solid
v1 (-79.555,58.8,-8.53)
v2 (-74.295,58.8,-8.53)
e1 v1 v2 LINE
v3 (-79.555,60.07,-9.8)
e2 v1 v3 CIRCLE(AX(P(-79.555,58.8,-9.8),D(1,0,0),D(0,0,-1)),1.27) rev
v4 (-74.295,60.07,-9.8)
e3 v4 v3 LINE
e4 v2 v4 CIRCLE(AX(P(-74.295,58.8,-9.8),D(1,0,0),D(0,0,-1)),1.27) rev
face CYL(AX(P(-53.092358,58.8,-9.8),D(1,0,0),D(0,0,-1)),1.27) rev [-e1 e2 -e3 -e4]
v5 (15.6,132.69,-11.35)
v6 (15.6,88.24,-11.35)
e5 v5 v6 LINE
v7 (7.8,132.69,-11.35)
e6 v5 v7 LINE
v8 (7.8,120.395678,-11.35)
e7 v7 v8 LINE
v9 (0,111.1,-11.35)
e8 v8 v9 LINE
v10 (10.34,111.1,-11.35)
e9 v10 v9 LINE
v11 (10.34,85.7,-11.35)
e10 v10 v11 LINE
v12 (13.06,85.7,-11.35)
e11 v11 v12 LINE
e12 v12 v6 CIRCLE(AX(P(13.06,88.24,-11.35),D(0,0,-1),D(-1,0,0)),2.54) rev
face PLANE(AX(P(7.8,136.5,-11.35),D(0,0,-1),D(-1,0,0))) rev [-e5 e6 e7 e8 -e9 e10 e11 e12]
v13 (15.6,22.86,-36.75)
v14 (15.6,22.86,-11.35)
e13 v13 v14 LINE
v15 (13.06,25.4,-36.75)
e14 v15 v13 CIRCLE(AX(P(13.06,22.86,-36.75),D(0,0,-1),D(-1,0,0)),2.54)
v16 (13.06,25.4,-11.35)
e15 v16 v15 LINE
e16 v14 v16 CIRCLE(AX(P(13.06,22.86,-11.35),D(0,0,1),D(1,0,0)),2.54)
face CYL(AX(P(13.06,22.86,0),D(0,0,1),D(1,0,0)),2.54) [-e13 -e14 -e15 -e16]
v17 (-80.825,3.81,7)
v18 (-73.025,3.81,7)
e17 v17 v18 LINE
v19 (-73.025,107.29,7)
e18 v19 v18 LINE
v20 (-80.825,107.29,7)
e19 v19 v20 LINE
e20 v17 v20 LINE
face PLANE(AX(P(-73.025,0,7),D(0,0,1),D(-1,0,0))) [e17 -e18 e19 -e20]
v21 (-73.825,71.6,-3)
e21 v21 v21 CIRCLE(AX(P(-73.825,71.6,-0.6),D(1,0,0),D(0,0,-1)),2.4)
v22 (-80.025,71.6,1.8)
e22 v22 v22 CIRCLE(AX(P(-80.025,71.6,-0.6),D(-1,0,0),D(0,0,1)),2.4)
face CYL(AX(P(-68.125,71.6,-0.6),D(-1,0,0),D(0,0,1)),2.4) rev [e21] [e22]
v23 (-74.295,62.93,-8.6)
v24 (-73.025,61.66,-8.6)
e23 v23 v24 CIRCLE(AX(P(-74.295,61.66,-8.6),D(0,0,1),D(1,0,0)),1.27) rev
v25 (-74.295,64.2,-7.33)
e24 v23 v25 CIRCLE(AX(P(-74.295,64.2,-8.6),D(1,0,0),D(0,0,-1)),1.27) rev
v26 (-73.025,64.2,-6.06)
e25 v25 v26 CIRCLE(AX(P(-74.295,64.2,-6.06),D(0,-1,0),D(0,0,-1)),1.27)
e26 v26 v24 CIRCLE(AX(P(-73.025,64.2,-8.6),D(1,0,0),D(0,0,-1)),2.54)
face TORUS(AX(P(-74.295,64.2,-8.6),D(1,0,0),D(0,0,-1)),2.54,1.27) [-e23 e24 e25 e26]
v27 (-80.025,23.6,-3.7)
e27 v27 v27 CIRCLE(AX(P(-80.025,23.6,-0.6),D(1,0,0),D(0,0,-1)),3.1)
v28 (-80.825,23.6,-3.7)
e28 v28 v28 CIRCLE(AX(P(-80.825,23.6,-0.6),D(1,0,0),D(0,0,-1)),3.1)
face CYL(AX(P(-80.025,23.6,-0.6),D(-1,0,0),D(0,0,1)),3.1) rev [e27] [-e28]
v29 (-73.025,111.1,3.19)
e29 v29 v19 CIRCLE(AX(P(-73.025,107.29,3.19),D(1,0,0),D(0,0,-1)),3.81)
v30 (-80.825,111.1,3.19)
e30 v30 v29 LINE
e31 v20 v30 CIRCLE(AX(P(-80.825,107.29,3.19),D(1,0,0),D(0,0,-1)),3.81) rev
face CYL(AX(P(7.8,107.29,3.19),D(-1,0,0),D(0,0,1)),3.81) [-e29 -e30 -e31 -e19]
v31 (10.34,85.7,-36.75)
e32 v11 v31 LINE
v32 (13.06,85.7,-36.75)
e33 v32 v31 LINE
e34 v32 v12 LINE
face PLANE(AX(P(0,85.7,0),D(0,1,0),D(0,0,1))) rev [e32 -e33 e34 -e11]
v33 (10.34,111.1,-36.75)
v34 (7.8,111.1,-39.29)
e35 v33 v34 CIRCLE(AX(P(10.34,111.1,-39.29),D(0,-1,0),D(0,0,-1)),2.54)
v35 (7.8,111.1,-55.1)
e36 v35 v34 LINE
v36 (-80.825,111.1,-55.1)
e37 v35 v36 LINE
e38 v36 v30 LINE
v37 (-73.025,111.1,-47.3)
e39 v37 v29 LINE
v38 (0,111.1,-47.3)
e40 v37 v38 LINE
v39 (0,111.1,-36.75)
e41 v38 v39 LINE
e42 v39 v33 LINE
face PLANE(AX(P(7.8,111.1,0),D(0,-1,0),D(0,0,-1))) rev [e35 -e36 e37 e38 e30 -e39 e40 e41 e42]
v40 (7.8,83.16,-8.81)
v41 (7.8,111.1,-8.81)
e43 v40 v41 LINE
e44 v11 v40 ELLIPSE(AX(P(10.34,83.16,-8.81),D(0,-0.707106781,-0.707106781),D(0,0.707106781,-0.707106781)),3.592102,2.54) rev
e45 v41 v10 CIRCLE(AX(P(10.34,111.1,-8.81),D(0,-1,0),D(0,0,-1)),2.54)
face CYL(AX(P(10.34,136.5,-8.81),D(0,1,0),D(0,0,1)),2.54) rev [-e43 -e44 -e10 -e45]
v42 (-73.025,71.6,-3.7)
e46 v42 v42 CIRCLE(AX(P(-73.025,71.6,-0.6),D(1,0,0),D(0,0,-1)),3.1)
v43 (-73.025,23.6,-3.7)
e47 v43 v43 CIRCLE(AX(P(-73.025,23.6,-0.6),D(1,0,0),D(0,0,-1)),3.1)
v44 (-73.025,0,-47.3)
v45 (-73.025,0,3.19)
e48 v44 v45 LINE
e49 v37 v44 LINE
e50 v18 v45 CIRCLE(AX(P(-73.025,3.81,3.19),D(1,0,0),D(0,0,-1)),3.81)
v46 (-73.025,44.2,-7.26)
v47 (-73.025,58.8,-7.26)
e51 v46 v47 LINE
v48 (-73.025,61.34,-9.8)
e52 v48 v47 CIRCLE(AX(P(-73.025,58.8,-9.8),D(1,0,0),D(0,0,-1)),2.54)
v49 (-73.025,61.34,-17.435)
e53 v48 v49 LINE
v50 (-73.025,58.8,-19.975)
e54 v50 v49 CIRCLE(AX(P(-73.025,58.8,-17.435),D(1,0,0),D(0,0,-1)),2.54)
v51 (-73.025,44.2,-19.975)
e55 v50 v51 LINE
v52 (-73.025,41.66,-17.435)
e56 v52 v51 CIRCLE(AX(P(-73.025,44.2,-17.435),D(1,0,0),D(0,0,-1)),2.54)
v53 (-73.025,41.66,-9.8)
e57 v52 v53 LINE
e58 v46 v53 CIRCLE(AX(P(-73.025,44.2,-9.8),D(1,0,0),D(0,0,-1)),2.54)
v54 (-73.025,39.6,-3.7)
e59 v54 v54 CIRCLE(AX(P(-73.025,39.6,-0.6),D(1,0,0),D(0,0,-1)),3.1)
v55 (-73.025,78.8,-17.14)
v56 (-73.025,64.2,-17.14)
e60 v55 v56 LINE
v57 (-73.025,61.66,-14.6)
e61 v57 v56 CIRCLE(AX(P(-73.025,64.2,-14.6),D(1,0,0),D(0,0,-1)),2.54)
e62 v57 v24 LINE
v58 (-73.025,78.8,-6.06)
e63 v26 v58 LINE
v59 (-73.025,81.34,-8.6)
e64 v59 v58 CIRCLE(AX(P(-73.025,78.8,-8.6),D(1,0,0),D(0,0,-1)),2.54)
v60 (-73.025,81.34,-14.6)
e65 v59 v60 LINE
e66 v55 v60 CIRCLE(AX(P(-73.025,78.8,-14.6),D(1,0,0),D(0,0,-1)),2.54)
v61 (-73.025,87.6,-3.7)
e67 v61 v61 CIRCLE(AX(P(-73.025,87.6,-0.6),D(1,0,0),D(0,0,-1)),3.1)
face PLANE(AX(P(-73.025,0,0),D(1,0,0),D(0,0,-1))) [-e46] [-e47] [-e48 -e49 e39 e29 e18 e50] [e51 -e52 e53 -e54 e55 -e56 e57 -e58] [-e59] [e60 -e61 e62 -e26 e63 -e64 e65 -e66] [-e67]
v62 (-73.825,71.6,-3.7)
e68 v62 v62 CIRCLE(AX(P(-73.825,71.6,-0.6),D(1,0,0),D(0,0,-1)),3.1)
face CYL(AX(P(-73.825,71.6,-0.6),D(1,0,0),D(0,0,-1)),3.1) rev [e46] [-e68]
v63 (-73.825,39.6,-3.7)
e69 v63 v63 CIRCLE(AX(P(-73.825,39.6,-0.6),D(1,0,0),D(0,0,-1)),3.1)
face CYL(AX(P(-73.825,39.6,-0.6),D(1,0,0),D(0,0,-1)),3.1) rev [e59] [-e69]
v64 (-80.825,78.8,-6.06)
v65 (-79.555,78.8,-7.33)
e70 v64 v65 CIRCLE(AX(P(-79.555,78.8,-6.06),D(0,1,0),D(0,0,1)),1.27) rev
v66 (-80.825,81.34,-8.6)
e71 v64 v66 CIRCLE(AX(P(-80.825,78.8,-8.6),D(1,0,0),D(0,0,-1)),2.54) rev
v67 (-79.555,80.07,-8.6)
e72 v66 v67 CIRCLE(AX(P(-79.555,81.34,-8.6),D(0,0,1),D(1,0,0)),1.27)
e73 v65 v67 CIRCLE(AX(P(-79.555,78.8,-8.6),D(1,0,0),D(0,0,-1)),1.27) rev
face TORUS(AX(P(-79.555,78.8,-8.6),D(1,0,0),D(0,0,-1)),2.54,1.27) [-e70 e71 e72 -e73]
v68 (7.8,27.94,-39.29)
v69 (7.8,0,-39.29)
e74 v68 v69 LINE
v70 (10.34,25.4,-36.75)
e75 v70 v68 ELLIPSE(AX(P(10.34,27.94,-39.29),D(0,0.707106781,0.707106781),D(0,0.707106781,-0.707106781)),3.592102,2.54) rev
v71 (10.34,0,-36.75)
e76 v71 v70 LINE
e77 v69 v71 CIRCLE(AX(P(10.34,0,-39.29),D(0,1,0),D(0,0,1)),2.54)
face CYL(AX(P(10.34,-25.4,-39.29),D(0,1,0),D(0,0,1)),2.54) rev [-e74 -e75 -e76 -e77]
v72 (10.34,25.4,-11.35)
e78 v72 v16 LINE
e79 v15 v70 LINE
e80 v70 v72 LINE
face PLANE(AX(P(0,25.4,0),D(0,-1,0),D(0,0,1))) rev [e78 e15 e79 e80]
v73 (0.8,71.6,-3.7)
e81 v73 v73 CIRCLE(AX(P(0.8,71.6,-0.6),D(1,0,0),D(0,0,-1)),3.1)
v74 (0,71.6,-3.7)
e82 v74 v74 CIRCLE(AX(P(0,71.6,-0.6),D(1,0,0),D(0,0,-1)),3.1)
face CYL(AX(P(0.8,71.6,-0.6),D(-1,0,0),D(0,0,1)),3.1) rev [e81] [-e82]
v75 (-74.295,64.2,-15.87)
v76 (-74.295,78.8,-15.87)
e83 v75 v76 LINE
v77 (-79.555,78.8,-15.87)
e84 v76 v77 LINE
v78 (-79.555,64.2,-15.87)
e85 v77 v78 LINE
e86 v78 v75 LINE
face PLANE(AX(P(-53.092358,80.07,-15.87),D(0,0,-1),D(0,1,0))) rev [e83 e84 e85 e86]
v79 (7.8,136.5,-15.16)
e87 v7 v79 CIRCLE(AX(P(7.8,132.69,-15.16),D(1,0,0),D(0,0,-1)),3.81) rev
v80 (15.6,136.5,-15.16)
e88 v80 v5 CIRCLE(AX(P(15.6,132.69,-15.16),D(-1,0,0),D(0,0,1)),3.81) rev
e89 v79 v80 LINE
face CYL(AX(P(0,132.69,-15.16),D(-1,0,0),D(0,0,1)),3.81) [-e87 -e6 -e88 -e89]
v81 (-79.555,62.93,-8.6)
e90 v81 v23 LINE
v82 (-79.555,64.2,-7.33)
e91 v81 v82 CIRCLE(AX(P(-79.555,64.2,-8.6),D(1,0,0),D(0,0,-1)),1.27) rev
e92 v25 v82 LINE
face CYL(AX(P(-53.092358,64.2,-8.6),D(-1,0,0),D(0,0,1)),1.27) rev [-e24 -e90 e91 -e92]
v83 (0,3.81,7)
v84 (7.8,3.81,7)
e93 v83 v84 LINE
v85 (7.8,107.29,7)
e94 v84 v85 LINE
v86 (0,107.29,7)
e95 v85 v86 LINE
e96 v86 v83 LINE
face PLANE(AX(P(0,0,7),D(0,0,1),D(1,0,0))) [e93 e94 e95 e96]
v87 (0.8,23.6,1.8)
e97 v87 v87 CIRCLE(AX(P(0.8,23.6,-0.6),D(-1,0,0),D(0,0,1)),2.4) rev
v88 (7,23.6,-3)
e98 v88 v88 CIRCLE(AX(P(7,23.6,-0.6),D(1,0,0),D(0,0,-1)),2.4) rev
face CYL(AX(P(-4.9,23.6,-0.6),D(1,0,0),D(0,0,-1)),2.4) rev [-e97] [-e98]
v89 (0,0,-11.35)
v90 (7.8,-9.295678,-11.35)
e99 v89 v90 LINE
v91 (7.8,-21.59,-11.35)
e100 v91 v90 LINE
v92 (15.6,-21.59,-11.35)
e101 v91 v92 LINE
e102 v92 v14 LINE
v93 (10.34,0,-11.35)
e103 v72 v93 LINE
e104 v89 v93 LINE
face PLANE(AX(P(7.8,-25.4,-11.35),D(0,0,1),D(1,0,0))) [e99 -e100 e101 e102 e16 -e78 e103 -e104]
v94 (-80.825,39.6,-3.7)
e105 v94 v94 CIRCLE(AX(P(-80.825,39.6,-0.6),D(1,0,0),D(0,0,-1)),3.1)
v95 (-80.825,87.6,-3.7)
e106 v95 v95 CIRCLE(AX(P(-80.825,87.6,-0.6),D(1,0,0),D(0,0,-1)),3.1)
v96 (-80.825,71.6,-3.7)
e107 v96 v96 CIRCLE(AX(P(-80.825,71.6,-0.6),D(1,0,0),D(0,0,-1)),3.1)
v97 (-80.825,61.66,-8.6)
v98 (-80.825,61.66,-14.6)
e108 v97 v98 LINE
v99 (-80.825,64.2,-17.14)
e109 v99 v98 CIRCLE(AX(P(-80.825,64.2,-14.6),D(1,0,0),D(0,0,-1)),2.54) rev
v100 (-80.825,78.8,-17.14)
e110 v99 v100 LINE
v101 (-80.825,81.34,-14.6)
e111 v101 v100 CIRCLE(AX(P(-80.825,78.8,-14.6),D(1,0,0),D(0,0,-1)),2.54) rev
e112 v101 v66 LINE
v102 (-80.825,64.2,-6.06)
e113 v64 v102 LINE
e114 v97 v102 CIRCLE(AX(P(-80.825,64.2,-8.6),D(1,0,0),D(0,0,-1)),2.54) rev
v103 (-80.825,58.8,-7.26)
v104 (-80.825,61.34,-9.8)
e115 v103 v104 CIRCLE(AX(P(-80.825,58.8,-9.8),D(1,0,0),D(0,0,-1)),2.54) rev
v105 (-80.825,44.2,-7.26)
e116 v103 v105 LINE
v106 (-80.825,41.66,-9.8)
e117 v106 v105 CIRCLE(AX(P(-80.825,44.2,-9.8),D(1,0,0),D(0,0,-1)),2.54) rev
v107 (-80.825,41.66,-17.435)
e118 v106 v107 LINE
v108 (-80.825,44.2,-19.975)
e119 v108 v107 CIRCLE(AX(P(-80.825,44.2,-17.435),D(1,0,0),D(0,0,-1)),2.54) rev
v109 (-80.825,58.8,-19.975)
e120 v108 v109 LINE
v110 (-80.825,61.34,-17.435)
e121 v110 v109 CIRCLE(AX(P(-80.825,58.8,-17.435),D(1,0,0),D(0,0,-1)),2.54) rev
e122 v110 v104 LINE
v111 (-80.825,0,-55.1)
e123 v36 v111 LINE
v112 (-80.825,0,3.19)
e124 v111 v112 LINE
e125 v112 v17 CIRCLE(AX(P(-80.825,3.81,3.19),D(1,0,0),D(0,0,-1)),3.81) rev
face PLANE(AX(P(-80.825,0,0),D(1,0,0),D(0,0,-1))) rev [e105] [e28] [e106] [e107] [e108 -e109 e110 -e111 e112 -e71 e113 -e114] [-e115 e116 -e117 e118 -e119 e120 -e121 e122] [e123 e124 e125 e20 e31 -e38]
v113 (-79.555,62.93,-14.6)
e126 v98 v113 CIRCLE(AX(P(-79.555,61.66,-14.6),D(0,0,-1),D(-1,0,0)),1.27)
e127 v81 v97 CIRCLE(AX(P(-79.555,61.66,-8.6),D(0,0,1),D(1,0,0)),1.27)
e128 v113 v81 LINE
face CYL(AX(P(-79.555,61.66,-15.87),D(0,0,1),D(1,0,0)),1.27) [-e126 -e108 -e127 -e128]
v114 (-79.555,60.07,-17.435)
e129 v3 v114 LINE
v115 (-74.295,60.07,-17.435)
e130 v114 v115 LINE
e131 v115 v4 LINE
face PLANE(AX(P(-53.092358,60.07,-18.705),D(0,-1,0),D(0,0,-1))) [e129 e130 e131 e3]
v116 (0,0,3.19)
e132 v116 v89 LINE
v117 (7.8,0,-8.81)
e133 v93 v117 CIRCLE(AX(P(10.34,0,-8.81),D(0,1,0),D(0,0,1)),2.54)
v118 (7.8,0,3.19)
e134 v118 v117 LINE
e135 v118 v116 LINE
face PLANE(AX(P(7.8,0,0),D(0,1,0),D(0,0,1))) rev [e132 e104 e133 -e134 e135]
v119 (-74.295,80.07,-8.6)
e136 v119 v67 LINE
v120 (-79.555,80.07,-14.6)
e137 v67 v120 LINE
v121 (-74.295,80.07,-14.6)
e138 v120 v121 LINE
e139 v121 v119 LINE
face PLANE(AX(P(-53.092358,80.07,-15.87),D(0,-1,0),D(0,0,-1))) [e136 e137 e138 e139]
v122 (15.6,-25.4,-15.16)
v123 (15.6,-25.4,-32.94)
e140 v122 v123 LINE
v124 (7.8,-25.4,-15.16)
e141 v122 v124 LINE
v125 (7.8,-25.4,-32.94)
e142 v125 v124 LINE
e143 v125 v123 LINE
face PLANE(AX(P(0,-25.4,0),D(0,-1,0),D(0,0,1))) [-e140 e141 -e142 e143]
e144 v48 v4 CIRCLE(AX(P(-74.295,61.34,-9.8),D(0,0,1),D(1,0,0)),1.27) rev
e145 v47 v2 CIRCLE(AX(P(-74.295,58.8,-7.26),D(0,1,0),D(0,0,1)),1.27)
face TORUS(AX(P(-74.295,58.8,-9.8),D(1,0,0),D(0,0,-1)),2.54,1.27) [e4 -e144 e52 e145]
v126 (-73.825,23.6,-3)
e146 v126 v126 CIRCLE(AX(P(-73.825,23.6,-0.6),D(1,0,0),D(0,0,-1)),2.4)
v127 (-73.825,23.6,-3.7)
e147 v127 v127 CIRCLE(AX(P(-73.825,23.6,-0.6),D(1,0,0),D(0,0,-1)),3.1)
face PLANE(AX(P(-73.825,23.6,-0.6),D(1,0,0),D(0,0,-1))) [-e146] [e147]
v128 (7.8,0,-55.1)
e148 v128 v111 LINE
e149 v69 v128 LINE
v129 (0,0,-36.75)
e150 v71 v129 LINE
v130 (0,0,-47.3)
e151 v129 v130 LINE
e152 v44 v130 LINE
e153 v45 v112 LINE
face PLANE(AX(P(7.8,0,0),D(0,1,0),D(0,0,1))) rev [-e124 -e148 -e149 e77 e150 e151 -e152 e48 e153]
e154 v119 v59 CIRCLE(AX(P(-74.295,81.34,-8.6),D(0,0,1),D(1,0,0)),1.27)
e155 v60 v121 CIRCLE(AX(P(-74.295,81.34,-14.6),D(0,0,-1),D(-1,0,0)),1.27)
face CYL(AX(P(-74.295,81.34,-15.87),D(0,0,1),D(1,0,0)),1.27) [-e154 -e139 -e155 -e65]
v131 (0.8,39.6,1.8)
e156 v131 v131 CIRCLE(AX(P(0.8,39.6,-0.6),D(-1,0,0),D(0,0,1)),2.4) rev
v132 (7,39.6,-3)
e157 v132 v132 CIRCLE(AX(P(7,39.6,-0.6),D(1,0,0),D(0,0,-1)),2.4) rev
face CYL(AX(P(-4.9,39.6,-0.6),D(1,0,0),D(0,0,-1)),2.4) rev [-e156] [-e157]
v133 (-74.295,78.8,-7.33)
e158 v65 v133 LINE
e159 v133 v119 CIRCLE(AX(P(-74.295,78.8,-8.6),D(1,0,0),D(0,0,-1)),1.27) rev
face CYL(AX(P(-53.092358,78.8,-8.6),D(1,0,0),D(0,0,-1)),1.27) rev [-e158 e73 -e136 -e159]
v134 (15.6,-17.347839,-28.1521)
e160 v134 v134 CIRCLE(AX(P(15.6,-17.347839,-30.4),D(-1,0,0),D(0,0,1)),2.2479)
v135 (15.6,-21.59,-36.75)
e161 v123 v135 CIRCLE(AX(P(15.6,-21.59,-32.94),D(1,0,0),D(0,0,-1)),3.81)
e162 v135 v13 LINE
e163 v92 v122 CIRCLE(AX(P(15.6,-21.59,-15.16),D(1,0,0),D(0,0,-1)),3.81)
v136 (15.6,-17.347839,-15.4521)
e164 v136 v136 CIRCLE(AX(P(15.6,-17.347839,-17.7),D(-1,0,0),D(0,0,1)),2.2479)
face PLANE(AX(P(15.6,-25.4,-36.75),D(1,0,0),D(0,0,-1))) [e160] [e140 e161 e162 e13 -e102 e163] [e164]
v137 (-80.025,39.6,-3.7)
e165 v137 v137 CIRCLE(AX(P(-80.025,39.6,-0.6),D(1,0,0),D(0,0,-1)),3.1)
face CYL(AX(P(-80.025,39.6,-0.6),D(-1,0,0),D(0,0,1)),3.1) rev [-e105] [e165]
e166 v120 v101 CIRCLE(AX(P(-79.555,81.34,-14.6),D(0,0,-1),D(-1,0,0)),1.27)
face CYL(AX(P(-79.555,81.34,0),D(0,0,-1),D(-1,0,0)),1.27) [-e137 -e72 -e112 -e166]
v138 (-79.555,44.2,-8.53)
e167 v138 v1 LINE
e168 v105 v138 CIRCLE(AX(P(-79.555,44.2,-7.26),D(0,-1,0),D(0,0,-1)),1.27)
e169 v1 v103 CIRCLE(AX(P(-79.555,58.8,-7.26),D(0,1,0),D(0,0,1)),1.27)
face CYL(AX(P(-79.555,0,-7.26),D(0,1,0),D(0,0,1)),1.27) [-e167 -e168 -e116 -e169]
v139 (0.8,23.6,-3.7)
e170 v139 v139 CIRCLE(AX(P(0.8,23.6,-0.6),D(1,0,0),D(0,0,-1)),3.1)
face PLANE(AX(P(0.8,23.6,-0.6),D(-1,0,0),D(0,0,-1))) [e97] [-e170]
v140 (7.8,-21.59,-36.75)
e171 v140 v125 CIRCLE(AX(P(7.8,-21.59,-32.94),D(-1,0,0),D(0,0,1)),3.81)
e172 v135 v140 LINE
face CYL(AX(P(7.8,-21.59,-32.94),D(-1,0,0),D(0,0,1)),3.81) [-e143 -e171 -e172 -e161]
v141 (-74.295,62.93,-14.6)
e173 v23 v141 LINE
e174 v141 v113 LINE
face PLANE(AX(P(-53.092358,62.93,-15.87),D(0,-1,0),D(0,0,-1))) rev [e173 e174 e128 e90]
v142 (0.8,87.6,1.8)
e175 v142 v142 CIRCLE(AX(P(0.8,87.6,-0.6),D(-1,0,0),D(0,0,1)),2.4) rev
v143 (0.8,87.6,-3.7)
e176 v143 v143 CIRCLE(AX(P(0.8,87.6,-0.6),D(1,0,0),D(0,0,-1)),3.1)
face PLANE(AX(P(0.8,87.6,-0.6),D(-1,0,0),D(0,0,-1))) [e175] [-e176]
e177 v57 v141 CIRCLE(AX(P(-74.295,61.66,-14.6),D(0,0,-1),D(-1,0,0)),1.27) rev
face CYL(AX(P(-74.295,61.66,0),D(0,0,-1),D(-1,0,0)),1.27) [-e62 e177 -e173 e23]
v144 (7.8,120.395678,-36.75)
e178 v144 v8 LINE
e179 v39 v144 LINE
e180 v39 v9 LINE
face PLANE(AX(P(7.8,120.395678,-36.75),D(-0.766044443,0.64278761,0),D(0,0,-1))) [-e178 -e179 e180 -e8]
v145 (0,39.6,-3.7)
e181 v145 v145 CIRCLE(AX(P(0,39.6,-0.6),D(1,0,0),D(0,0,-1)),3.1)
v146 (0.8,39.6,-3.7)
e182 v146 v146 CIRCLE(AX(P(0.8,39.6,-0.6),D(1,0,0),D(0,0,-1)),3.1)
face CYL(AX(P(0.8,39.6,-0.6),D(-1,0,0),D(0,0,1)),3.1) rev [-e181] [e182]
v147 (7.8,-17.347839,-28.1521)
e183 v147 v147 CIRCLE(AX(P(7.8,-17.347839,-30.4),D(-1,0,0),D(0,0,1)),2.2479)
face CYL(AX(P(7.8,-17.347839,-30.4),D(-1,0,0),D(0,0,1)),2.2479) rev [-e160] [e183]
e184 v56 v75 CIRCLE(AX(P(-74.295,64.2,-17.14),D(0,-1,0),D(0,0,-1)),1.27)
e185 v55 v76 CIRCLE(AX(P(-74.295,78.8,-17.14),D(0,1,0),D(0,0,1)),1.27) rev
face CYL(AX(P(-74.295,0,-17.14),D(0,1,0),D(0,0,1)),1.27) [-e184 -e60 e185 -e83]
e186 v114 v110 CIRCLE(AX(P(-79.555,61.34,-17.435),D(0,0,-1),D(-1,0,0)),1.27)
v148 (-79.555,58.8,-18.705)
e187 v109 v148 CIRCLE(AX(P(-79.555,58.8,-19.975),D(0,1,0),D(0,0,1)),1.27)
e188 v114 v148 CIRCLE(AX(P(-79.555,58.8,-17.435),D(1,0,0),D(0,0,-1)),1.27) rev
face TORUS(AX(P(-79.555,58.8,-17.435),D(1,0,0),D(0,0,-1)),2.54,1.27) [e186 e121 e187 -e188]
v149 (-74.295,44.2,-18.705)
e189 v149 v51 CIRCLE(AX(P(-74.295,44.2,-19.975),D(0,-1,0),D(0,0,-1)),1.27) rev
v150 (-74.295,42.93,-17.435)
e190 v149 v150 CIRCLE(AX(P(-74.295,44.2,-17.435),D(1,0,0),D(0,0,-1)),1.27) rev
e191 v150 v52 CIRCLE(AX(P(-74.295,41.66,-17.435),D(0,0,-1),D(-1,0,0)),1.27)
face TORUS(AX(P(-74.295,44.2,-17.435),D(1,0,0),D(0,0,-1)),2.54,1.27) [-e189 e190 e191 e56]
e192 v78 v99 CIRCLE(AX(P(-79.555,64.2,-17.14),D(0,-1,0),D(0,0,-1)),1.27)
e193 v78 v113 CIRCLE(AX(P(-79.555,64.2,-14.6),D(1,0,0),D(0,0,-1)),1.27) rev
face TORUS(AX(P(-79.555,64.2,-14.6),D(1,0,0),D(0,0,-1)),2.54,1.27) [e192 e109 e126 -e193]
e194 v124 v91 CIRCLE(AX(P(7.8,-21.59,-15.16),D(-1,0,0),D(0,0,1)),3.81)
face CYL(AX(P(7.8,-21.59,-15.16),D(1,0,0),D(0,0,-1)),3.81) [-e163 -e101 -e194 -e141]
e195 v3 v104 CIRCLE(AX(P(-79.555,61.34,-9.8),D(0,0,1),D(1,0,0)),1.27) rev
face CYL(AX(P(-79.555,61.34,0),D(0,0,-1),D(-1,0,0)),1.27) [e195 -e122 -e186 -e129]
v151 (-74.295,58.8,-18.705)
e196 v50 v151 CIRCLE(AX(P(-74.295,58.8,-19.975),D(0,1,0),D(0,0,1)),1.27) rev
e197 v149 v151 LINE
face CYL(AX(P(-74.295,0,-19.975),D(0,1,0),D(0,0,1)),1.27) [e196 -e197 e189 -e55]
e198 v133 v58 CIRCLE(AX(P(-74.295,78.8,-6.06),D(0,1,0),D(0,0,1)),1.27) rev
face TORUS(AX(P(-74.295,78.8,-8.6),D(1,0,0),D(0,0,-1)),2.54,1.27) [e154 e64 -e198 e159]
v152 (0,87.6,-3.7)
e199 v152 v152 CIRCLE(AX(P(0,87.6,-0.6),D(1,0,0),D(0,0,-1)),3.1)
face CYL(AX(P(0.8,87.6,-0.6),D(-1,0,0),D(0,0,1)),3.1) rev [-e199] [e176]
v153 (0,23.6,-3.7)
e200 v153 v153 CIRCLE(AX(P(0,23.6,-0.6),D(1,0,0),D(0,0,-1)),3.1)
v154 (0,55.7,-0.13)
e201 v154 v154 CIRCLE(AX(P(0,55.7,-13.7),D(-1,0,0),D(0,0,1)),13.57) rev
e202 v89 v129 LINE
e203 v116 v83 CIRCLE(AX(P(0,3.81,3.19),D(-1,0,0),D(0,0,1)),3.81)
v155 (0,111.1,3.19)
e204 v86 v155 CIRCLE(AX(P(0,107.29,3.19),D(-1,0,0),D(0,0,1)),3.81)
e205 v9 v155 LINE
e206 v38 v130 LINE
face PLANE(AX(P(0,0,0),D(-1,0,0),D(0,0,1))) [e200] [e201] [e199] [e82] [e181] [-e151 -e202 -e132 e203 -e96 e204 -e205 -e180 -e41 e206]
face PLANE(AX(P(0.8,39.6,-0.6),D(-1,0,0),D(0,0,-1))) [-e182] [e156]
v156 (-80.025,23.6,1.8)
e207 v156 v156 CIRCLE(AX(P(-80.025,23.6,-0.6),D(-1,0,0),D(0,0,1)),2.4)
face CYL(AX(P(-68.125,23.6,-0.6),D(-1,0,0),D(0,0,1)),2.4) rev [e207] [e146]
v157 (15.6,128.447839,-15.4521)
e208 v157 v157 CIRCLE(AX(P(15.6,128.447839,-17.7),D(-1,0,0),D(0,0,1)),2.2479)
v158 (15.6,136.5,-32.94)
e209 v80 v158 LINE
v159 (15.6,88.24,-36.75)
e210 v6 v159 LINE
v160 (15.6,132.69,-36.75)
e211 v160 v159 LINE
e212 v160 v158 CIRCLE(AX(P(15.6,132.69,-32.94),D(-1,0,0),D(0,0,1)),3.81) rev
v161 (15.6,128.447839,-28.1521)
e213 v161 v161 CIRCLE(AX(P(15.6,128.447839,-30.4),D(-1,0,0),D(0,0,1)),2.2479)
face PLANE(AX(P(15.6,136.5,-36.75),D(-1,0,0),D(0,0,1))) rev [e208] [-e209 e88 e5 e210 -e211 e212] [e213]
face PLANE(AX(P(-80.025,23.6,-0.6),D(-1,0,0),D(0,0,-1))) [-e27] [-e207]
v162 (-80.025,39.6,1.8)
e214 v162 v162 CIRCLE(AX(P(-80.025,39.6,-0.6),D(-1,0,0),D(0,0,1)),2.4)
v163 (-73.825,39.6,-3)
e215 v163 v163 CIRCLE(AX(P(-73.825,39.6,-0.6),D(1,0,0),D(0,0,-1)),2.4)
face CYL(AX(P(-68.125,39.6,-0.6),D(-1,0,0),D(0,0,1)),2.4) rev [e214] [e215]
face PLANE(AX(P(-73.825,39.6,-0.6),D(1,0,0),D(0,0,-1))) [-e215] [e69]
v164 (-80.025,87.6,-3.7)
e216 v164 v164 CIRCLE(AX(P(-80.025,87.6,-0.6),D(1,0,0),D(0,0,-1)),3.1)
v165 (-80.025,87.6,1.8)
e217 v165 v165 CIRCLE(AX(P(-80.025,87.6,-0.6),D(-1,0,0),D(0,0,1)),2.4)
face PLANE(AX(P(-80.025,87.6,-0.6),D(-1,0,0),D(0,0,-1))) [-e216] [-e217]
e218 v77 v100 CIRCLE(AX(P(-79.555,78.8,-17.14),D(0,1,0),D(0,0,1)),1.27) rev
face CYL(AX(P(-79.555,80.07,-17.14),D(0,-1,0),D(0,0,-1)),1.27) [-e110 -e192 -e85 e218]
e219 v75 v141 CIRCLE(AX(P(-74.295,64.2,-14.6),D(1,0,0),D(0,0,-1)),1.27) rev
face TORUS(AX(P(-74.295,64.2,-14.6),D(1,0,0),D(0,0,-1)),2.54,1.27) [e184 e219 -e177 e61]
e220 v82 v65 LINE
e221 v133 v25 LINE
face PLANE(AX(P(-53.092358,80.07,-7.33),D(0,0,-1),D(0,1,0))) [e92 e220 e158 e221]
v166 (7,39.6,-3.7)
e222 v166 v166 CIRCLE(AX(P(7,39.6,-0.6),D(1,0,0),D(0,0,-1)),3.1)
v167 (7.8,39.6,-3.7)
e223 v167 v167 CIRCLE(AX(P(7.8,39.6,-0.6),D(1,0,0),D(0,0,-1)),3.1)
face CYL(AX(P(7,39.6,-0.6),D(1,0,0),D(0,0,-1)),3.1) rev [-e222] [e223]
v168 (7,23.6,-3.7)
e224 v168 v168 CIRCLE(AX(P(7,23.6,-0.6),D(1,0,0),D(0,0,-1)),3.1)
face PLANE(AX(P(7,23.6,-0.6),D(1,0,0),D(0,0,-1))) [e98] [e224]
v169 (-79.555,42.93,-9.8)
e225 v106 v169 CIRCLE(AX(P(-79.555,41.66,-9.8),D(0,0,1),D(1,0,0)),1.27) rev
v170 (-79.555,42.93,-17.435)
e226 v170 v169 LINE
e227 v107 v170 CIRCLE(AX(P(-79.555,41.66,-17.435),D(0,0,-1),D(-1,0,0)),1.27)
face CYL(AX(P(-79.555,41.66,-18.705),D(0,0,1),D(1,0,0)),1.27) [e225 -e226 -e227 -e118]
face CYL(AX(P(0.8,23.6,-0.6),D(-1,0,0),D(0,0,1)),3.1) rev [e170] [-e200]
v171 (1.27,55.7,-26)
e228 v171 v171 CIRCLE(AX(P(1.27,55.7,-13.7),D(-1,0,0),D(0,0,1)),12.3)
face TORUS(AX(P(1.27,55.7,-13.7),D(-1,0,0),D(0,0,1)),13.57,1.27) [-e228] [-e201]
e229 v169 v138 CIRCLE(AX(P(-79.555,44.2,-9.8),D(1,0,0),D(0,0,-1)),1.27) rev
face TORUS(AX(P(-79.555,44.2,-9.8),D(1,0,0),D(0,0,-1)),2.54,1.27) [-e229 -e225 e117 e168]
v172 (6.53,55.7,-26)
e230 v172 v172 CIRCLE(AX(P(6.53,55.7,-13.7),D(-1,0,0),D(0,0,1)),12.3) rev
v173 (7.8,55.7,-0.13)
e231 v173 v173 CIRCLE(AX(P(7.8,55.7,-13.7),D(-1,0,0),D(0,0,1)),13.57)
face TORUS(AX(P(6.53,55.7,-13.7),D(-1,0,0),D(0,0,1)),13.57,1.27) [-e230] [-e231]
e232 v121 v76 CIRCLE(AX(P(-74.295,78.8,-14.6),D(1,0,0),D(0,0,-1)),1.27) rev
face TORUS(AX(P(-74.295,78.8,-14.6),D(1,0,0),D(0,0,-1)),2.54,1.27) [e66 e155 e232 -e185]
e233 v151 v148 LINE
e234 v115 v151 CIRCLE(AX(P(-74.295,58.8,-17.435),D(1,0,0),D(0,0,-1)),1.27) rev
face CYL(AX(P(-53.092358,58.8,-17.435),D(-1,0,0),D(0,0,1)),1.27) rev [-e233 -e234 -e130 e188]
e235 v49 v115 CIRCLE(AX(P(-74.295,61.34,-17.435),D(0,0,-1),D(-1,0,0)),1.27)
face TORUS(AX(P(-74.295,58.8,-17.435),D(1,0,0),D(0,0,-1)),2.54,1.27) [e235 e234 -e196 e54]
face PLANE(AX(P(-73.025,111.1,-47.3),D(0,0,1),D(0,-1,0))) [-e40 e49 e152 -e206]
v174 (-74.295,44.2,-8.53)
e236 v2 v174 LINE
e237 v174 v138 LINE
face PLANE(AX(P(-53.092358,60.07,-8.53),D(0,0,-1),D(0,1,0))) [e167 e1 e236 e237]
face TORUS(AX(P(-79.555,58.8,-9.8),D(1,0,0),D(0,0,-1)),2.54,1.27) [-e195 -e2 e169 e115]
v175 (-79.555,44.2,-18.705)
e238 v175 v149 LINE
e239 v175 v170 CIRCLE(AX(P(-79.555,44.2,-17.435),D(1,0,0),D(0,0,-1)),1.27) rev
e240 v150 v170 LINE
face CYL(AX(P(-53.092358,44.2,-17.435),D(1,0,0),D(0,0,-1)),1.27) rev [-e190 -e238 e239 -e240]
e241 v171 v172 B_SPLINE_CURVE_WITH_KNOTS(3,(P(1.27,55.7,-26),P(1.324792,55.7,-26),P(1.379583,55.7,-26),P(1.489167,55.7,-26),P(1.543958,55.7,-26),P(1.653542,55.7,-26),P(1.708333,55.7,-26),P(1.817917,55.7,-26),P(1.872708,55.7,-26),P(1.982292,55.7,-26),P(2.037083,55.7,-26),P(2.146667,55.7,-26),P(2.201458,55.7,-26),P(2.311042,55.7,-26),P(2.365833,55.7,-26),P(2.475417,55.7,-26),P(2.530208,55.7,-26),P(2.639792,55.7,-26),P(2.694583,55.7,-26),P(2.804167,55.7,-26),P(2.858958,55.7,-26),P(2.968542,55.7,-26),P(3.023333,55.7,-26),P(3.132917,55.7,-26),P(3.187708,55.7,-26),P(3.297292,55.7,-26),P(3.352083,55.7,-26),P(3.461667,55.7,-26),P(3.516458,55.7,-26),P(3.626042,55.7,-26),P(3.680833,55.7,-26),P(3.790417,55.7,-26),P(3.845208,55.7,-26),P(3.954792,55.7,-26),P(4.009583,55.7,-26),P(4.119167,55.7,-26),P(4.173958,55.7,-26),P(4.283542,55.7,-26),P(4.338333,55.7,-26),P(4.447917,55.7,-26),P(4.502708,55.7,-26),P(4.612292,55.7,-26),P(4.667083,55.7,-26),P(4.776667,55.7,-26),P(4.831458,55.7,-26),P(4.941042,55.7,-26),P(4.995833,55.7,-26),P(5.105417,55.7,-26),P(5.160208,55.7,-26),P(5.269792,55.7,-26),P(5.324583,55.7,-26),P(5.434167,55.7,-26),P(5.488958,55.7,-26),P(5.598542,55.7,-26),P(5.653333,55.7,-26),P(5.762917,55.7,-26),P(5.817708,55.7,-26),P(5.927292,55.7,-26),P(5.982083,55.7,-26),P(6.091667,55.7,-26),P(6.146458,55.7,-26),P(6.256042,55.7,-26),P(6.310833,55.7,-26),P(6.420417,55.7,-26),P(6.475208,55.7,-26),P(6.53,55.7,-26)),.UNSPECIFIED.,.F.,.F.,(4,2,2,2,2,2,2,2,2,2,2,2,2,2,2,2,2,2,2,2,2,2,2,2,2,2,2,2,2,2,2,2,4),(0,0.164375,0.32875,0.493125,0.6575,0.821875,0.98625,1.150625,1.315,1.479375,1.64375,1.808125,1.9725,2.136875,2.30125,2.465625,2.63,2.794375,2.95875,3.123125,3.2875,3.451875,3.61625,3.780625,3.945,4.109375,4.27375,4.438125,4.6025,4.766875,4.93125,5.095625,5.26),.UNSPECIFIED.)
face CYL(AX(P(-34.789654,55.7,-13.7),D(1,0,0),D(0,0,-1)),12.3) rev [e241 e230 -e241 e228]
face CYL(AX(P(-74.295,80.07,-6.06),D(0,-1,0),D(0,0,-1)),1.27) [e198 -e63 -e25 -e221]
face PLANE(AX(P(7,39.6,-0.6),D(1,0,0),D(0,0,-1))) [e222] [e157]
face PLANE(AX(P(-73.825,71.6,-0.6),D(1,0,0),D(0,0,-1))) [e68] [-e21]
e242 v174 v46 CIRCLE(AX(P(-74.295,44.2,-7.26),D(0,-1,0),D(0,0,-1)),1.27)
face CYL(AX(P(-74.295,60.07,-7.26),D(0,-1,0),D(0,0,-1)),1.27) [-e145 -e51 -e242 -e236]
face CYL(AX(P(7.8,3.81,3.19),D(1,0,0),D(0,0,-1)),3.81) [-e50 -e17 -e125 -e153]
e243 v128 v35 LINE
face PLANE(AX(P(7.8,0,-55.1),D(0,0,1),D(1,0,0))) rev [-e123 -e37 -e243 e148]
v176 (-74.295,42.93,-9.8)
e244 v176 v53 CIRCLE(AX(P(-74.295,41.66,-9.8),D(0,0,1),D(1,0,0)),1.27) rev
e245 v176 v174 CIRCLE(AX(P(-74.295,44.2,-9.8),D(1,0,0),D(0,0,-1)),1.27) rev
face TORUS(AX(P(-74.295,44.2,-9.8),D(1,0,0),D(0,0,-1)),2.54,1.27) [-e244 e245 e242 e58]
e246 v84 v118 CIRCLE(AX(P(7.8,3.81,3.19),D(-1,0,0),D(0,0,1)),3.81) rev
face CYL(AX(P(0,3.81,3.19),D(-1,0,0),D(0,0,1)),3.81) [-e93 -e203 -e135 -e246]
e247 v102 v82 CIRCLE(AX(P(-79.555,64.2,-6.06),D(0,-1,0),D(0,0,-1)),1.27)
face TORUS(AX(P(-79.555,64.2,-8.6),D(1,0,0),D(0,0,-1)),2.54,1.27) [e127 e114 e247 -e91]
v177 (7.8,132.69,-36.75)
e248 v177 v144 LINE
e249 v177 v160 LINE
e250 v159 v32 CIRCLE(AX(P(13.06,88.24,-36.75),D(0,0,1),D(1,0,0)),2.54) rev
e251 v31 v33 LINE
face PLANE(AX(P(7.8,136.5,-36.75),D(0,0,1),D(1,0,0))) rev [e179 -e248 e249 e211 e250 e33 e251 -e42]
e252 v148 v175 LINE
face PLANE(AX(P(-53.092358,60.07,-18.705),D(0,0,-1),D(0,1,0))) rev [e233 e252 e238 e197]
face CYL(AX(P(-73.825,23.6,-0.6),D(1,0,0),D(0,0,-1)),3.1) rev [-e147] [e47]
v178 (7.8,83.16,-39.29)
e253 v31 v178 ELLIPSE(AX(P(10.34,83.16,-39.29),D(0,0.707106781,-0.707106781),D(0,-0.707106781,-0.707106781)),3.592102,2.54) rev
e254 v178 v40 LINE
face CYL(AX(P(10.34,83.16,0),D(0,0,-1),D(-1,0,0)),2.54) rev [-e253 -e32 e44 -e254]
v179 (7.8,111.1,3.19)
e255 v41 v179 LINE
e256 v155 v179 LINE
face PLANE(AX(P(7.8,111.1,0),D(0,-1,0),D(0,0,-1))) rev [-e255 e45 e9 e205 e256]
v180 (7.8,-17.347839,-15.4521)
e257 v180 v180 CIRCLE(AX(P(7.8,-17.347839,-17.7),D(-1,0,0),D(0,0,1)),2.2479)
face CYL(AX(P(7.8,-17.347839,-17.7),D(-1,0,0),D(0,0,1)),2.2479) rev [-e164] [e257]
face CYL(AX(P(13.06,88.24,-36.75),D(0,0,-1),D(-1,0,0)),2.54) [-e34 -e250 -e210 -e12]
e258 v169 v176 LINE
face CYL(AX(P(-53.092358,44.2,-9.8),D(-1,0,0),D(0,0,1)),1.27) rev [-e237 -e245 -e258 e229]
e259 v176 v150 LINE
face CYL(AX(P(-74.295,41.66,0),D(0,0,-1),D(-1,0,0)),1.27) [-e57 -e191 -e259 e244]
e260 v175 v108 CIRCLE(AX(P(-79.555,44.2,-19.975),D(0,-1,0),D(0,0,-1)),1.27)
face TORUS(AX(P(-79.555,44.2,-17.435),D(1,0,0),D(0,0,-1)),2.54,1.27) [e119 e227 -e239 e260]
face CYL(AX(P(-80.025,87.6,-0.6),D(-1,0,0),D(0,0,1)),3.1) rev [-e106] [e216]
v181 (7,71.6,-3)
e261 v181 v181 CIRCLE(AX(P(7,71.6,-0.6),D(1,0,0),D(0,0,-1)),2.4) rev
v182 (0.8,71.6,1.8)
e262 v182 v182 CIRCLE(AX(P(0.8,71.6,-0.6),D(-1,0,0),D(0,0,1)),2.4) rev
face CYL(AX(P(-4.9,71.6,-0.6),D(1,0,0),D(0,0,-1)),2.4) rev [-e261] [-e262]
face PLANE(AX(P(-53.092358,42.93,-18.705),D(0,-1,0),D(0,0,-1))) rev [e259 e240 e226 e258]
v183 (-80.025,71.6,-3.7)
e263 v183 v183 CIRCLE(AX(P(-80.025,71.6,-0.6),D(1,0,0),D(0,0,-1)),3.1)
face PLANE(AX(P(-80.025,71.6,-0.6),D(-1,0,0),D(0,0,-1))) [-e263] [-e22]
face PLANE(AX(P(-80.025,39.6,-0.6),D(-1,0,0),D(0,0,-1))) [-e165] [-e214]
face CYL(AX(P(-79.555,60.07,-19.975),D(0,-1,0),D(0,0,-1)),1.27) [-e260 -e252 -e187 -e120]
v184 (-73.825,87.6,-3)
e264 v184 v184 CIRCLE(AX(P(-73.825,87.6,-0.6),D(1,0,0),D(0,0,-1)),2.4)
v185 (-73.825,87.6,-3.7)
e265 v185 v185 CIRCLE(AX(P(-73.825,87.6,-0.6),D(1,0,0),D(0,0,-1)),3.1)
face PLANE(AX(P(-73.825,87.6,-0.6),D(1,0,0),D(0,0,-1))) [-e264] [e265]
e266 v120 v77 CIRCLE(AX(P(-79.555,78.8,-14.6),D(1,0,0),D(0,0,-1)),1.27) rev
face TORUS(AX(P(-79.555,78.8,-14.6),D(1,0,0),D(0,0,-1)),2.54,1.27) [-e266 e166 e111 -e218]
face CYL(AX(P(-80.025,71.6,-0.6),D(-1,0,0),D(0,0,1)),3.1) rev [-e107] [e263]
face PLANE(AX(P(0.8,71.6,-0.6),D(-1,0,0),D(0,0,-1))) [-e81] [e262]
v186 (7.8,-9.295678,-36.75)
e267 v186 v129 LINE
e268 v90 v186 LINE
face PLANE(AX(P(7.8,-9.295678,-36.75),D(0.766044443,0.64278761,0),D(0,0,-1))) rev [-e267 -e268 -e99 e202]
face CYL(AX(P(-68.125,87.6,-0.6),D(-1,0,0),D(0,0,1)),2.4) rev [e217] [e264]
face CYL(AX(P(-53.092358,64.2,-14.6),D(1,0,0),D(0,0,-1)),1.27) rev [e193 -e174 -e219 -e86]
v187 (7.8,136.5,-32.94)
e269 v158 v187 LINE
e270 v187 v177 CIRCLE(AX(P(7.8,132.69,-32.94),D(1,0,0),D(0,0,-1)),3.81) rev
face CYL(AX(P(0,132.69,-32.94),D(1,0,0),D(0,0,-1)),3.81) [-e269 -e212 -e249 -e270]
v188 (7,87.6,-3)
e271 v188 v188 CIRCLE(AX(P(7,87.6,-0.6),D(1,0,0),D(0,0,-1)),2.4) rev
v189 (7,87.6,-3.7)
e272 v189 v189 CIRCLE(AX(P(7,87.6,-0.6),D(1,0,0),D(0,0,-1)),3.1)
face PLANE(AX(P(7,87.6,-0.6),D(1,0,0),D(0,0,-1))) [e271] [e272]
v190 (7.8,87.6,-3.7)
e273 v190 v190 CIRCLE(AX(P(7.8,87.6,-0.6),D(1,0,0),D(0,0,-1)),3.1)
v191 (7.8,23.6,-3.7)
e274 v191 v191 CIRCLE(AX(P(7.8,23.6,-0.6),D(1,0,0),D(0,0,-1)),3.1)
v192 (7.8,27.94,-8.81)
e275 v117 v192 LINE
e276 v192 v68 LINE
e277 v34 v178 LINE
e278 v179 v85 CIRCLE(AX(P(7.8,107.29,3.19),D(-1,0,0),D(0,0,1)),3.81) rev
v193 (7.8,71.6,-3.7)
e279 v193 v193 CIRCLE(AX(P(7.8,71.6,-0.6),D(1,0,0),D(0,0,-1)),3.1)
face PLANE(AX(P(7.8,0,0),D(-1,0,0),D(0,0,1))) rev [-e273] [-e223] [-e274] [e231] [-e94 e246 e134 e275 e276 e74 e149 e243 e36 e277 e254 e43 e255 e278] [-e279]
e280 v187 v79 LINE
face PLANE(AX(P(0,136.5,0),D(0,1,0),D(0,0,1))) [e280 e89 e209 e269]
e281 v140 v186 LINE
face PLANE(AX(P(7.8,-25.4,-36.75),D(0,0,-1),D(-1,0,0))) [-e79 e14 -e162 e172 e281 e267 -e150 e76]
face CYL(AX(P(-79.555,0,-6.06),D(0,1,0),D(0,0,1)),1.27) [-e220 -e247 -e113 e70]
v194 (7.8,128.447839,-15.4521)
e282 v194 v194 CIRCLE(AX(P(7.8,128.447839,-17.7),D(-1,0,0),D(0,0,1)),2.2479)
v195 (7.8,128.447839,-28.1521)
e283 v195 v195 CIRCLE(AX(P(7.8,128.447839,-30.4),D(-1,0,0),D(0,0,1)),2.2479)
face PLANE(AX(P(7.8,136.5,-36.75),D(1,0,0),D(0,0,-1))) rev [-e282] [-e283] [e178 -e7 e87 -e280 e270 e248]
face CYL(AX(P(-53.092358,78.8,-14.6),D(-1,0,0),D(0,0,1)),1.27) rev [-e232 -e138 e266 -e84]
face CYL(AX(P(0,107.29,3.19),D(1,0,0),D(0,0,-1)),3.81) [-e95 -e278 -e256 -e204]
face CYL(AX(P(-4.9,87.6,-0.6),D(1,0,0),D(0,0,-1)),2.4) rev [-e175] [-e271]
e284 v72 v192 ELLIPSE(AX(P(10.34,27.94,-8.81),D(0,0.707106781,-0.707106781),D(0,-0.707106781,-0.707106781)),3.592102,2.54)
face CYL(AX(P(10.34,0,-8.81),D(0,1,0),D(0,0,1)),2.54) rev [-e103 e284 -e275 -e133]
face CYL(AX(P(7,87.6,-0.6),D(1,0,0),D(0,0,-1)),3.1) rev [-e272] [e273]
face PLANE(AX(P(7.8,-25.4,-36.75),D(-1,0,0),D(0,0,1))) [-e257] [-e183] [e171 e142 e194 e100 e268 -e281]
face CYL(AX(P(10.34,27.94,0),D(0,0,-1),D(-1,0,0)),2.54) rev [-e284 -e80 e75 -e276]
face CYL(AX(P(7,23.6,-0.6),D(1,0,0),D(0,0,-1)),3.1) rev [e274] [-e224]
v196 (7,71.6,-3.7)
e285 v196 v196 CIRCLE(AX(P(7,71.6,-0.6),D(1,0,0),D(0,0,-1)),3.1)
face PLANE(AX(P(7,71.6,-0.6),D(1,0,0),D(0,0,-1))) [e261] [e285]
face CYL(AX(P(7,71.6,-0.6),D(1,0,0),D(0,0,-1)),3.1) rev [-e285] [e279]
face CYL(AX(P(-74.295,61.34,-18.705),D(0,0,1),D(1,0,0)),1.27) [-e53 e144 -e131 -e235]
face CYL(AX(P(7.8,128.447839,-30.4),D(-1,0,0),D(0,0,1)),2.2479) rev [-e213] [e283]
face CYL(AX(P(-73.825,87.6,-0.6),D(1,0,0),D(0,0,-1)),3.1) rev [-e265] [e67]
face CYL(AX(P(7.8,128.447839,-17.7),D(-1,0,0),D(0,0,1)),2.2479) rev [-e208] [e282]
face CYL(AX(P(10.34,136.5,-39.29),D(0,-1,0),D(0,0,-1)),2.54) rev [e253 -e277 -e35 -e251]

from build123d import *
from OCP.BRepFilletAPI import BRepFilletAPI_MakeChamfer

# Parameters (mm, degrees)
SKETCH1_W               = 55.1
SKETCH1_H               = 111.1
BOSS_EXTRUDE1_DEPTH     = 7.8
SKETCH2_W               = 7.8
SKETCH2_H               = 111.1
BOSS_EXTRUDE2_DEPTH     = 73.025
SKETCH4_W               = 55.1
SKETCH4_H               = 111.1
BOSS_EXTRUDE3_DEPTH     = 7.8
SKETCH7_W               = 7.8
SKETCH7_H               = 111.1
BOSS_EXTRUDE4_DEPTH     = 7
SKETCH8_R               = 2.4
CUT_EXTRUDE4_DEPTH      = 12.7
SKETCH8_4_R             = 3.1
CUT_EXTRUDE5_DEPTH      = 0.8
MIRROR2_COPY_1_SKETCH_R = 3.1
MIRROR2_COPY_1_DEPTH    = 0.8
SKETCH10_R              = 12.3
CUT_EXTRUDE7_DEPTH      = 7.8
SKETCH11_W              = 8.54
SKETCH11_H              = 17.14
SKETCH11_W_2            = 10.175
CUT_EXTRUDE8_DEPTH      = 7.8
FILLET1_R               = 1.27
SKETCH12_W              = 7.8
SKETCH12_H              = 25.4
BOSS_EXTRUDE5_DEPTH     = 25.4
CHAMFER2_SIZE           = 7.8
CHAMFER2_SIZE_2         = 9.295678022
FILLET3_R               = 3.81
FILLET4_R               = 2.54
F_8_CLEARANCE_HOLE1_D   = 4.4958


with BuildPart() as part:
    # Sketch1 → Boss-Extrude1 (new body)
    with BuildSketch(Plane(origin=(0, 0, 0), x_dir=(0, 0, -1), z_dir=(1, 0, 0))):
        with Locations((27.55, 55.55)):
            Rectangle(SKETCH1_W, SKETCH1_H)
    extrude(amount=BOSS_EXTRUDE1_DEPTH)

    # Sketch2 → Boss-Extrude2 (add)
    with BuildSketch(Plane.ZY):
        with Locations((-51.2, 55.55)):
            Rectangle(SKETCH2_W, SKETCH2_H)
    extrude(amount=BOSS_EXTRUDE2_DEPTH)

    # Sketch4 → Boss-Extrude3 (add)
    with BuildSketch(Plane.ZY.offset(73.025)):
        with Locations((-27.55, 55.55)):
            Rectangle(SKETCH4_W, SKETCH4_H)
    extrude(amount=BOSS_EXTRUDE3_DEPTH)

    # Sketch7 → Boss-Extrude4 (add)
    with BuildSketch(Plane.XY):
        with Locations((3.9, 55.55)):
            Rectangle(SKETCH7_W, SKETCH7_H)
    boss_extrude4 = extrude(amount=BOSS_EXTRUDE4_DEPTH)

    # Sketch8 → Cut-Extrude4 (cut)
    with BuildSketch(Plane(origin=(7.8, 0, 0), x_dir=(0, 0, -1), z_dir=(1, 0, 0))):
        with Locations((0.6, 23.6)):
            Circle(SKETCH8_R)
        with Locations((0.6, 39.6)):
            Circle(SKETCH8_R)
        with Locations((0.6, 87.6)):
            Circle(SKETCH8_R)
        with Locations((0.6, 71.6)):
            Circle(SKETCH8_R)
    cut_extrude4 = extrude(amount=-CUT_EXTRUDE4_DEPTH, mode=Mode.SUBTRACT)

    # Sketch8<4> → Cut-Extrude5 (cut)
    with BuildSketch(Plane(origin=(7.8, 0, 0), x_dir=(0, 0, -1), z_dir=(1, 0, 0))):
        with Locations((0.6, 23.6)):
            Circle(SKETCH8_4_R)
        with Locations((0.6, 39.6)):
            Circle(SKETCH8_4_R)
        with Locations((0.6, 87.6)):
            Circle(SKETCH8_4_R)
        with Locations((0.6, 71.6)):
            Circle(SKETCH8_4_R)
    cut_extrude5 = extrude(amount=-CUT_EXTRUDE5_DEPTH, mode=Mode.SUBTRACT)

    # Mirror1: Cut-Extrude5 across plane
    add(cut_extrude5.mirror(Plane(origin=(3.9, 0, 0), x_dir=(0, 0, 1), z_dir=(1, 0, 0))), mode=Mode.SUBTRACT)

    # Mirror2: Boss-Extrude4, Cut-Extrude4, Cut-Extrude5 across plane
    add(boss_extrude4.mirror(Plane.ZY.offset(36.5125)))
    add(cut_extrude4.mirror(Plane.ZY.offset(36.5125)), mode=Mode.SUBTRACT)
    add(cut_extrude5.mirror(Plane.ZY.offset(36.5125)), mode=Mode.SUBTRACT)

    # Mirror2 copy 1 sketch → Mirror2 copy 1 (cut)
    with BuildSketch(Plane(origin=(-73.025, 0, 0), x_dir=(0, 0, -1), z_dir=(1, 0, 0))):
        with Locations((0.6, 23.6)):
            Circle(MIRROR2_COPY_1_SKETCH_R)
        with Locations((0.6, 39.6)):
            Circle(MIRROR2_COPY_1_SKETCH_R)
        with Locations((0.6, 87.6)):
            Circle(MIRROR2_COPY_1_SKETCH_R)
        with Locations((0.6, 71.6)):
            Circle(MIRROR2_COPY_1_SKETCH_R)
    extrude(amount=-MIRROR2_COPY_1_DEPTH, mode=Mode.SUBTRACT)

    # Sketch10 → Cut-Extrude7 (cut)
    with BuildSketch(Plane(origin=(7.8, 0, 0), x_dir=(0, 0, -1), z_dir=(1, 0, 0))):
        with Locations((13.7, 55.7)):
            Circle(SKETCH10_R)
    extrude(amount=-CUT_EXTRUDE7_DEPTH, mode=Mode.SUBTRACT)

    # Sketch11 → Cut-Extrude8 (cut)
    with BuildSketch(Plane.ZY.offset(80.825)):
        with Locations((-11.6, 71.500000124)):
            Rectangle(SKETCH11_W, SKETCH11_H)
        with Locations((-13.6175, 51.5)):
            Rectangle(SKETCH11_W_2, SKETCH11_H)
    extrude(amount=-CUT_EXTRUDE8_DEPTH, mode=Mode.SUBTRACT)

    # Fillet1
    fillet1_edges = [part.edges().sort_by_distance(p)[0] for p in [
        (7.8, 55.7, -1.4),
        (0, 55.7, -1.4),
        (-73.025, 80.070000124, -11.6),
        (-73.025, 71.500000124, -7.33),
        (-80.825, 71.500000124, -15.87),
        (-80.825, 62.930000124, -11.6),
        (-73.025, 62.930000124, -11.6),
        (-76.925, 62.930000124, -7.33),
        (-76.925, 80.070000124, -7.33),
        (-80.825, 71.500000124, -7.33),
        (-76.925, 80.070000124, -15.87),
        (-80.825, 80.070000124, -11.6),
        (-73.025, 71.500000124, -15.87),
        (-76.925, 62.930000124, -15.87),
        (-73.025, 60.07, -13.6175),
        (-73.025, 51.5, -8.53),
        (-80.825, 51.5, -18.705),
        (-80.825, 42.93, -13.6175),
        (-73.025, 51.5, -18.705),
        (-76.925, 42.93, -18.705),
        (-73.025, 42.93, -13.6175),
        (-76.925, 42.93, -8.53),
        (-76.925, 60.07, -8.53),
        (-80.825, 51.5, -8.53),
        (-76.925, 60.07, -18.705),
        (-80.825, 60.07, -13.6175),
    ]]
    fillet(fillet1_edges, radius=FILLET1_R)

    # Sketch12 → Boss-Extrude5 (add, symmetric)
    with BuildSketch(Plane(origin=(0, 111.1, 0), x_dir=(1, 0, 0), z_dir=(0, 1, 0))):
        with Locations((11.7, 24.05)):
            Rectangle(SKETCH12_W, SKETCH12_H)
    boss_extrude5 = extrude(amount=BOSS_EXTRUDE5_DEPTH, both=True)

    # Mirror6: Boss-Extrude5 across plane
    add(boss_extrude5.mirror(Plane.ZX.offset(55.55)))

    # Chamfer2
    chamfer2_edges_1 = [part.edges().sort_by_distance(p)[0] for p in [
        (7.8, 111.1, -24.05),
    ]]
    chamfer2_side_1 = [part.faces().sort_by_distance(p)[0] for p in [
        (7.644, 111.1, -24.05),
    ]]
    chamfer2_edges_2 = [part.edges().sort_by_distance(p)[0] for p in [
        (7.8, 0, -24.05),
    ]]
    chamfer2_side_2 = [part.faces().sort_by_distance(p)[0] for p in [
        (7.644, 0, -24.05),
    ]]
    chamfer2 = BRepFilletAPI_MakeChamfer(part.part.solid().wrapped)
    for e in chamfer2_edges_1:
        chamfer2.Add(CHAMFER2_SIZE - 0.0001, CHAMFER2_SIZE_2 - 0.0001, e.wrapped, chamfer2_side_1[0].wrapped)
    for e in chamfer2_edges_2:
        chamfer2.Add(CHAMFER2_SIZE - 0.0001, CHAMFER2_SIZE_2 - 0.0001, e.wrapped, chamfer2_side_2[0].wrapped)
    add(Compound.cast(chamfer2.Shape()), mode=Mode.REPLACE)  # a hair under: the kernel refuses the full size

    # Fillet3
    fillet3_edges = [part.edges().sort_by_distance(p)[0] for p in [
        (-76.925, 111.1, 7),
        (-76.925, 0, 7),
        (11.7, 136.5, -11.35),
        (11.7, 136.5, -36.75),
        (11.7, -25.4, -36.75),
        (11.7, -25.4, -11.35),
        (3.9, 0, 7),
        (3.9, 111.1, 7),
    ]]
    fillet(fillet3_edges, radius=FILLET3_R)

    # Fillet4
    fillet4_edges = [part.edges().sort_by_distance(p)[0] for p in [
        (7.8, 98.4, -36.75),
        (7.8, 98.4, -11.35),
        (7.8, 85.7, -24.05),
        (15.6, 85.7, -24.05),
        (7.8, 12.7, -11.35),
        (7.8, 12.7, -36.75),
        (7.8, 25.4, -24.05),
        (15.6, 25.4, -24.05),
    ]]
    fillet(fillet4_edges, radius=FILLET4_R)

    # #8 Clearance Hole1 (through all)
    with Locations(Plane.ZY.offset(-7.8)):
        with Locations((-30.4, 128.447839011), (-17.7, 128.447839011)):
            f_8_clearance_hole1 = Hole(F_8_CLEARANCE_HOLE1_D / 2)

    # Mirror7: #8 Clearance Hole1 across plane
    add(f_8_clearance_hole1.mirror(Plane.ZX.offset(55.55)), mode=Mode.SUBTRACT)


solid = part.part
